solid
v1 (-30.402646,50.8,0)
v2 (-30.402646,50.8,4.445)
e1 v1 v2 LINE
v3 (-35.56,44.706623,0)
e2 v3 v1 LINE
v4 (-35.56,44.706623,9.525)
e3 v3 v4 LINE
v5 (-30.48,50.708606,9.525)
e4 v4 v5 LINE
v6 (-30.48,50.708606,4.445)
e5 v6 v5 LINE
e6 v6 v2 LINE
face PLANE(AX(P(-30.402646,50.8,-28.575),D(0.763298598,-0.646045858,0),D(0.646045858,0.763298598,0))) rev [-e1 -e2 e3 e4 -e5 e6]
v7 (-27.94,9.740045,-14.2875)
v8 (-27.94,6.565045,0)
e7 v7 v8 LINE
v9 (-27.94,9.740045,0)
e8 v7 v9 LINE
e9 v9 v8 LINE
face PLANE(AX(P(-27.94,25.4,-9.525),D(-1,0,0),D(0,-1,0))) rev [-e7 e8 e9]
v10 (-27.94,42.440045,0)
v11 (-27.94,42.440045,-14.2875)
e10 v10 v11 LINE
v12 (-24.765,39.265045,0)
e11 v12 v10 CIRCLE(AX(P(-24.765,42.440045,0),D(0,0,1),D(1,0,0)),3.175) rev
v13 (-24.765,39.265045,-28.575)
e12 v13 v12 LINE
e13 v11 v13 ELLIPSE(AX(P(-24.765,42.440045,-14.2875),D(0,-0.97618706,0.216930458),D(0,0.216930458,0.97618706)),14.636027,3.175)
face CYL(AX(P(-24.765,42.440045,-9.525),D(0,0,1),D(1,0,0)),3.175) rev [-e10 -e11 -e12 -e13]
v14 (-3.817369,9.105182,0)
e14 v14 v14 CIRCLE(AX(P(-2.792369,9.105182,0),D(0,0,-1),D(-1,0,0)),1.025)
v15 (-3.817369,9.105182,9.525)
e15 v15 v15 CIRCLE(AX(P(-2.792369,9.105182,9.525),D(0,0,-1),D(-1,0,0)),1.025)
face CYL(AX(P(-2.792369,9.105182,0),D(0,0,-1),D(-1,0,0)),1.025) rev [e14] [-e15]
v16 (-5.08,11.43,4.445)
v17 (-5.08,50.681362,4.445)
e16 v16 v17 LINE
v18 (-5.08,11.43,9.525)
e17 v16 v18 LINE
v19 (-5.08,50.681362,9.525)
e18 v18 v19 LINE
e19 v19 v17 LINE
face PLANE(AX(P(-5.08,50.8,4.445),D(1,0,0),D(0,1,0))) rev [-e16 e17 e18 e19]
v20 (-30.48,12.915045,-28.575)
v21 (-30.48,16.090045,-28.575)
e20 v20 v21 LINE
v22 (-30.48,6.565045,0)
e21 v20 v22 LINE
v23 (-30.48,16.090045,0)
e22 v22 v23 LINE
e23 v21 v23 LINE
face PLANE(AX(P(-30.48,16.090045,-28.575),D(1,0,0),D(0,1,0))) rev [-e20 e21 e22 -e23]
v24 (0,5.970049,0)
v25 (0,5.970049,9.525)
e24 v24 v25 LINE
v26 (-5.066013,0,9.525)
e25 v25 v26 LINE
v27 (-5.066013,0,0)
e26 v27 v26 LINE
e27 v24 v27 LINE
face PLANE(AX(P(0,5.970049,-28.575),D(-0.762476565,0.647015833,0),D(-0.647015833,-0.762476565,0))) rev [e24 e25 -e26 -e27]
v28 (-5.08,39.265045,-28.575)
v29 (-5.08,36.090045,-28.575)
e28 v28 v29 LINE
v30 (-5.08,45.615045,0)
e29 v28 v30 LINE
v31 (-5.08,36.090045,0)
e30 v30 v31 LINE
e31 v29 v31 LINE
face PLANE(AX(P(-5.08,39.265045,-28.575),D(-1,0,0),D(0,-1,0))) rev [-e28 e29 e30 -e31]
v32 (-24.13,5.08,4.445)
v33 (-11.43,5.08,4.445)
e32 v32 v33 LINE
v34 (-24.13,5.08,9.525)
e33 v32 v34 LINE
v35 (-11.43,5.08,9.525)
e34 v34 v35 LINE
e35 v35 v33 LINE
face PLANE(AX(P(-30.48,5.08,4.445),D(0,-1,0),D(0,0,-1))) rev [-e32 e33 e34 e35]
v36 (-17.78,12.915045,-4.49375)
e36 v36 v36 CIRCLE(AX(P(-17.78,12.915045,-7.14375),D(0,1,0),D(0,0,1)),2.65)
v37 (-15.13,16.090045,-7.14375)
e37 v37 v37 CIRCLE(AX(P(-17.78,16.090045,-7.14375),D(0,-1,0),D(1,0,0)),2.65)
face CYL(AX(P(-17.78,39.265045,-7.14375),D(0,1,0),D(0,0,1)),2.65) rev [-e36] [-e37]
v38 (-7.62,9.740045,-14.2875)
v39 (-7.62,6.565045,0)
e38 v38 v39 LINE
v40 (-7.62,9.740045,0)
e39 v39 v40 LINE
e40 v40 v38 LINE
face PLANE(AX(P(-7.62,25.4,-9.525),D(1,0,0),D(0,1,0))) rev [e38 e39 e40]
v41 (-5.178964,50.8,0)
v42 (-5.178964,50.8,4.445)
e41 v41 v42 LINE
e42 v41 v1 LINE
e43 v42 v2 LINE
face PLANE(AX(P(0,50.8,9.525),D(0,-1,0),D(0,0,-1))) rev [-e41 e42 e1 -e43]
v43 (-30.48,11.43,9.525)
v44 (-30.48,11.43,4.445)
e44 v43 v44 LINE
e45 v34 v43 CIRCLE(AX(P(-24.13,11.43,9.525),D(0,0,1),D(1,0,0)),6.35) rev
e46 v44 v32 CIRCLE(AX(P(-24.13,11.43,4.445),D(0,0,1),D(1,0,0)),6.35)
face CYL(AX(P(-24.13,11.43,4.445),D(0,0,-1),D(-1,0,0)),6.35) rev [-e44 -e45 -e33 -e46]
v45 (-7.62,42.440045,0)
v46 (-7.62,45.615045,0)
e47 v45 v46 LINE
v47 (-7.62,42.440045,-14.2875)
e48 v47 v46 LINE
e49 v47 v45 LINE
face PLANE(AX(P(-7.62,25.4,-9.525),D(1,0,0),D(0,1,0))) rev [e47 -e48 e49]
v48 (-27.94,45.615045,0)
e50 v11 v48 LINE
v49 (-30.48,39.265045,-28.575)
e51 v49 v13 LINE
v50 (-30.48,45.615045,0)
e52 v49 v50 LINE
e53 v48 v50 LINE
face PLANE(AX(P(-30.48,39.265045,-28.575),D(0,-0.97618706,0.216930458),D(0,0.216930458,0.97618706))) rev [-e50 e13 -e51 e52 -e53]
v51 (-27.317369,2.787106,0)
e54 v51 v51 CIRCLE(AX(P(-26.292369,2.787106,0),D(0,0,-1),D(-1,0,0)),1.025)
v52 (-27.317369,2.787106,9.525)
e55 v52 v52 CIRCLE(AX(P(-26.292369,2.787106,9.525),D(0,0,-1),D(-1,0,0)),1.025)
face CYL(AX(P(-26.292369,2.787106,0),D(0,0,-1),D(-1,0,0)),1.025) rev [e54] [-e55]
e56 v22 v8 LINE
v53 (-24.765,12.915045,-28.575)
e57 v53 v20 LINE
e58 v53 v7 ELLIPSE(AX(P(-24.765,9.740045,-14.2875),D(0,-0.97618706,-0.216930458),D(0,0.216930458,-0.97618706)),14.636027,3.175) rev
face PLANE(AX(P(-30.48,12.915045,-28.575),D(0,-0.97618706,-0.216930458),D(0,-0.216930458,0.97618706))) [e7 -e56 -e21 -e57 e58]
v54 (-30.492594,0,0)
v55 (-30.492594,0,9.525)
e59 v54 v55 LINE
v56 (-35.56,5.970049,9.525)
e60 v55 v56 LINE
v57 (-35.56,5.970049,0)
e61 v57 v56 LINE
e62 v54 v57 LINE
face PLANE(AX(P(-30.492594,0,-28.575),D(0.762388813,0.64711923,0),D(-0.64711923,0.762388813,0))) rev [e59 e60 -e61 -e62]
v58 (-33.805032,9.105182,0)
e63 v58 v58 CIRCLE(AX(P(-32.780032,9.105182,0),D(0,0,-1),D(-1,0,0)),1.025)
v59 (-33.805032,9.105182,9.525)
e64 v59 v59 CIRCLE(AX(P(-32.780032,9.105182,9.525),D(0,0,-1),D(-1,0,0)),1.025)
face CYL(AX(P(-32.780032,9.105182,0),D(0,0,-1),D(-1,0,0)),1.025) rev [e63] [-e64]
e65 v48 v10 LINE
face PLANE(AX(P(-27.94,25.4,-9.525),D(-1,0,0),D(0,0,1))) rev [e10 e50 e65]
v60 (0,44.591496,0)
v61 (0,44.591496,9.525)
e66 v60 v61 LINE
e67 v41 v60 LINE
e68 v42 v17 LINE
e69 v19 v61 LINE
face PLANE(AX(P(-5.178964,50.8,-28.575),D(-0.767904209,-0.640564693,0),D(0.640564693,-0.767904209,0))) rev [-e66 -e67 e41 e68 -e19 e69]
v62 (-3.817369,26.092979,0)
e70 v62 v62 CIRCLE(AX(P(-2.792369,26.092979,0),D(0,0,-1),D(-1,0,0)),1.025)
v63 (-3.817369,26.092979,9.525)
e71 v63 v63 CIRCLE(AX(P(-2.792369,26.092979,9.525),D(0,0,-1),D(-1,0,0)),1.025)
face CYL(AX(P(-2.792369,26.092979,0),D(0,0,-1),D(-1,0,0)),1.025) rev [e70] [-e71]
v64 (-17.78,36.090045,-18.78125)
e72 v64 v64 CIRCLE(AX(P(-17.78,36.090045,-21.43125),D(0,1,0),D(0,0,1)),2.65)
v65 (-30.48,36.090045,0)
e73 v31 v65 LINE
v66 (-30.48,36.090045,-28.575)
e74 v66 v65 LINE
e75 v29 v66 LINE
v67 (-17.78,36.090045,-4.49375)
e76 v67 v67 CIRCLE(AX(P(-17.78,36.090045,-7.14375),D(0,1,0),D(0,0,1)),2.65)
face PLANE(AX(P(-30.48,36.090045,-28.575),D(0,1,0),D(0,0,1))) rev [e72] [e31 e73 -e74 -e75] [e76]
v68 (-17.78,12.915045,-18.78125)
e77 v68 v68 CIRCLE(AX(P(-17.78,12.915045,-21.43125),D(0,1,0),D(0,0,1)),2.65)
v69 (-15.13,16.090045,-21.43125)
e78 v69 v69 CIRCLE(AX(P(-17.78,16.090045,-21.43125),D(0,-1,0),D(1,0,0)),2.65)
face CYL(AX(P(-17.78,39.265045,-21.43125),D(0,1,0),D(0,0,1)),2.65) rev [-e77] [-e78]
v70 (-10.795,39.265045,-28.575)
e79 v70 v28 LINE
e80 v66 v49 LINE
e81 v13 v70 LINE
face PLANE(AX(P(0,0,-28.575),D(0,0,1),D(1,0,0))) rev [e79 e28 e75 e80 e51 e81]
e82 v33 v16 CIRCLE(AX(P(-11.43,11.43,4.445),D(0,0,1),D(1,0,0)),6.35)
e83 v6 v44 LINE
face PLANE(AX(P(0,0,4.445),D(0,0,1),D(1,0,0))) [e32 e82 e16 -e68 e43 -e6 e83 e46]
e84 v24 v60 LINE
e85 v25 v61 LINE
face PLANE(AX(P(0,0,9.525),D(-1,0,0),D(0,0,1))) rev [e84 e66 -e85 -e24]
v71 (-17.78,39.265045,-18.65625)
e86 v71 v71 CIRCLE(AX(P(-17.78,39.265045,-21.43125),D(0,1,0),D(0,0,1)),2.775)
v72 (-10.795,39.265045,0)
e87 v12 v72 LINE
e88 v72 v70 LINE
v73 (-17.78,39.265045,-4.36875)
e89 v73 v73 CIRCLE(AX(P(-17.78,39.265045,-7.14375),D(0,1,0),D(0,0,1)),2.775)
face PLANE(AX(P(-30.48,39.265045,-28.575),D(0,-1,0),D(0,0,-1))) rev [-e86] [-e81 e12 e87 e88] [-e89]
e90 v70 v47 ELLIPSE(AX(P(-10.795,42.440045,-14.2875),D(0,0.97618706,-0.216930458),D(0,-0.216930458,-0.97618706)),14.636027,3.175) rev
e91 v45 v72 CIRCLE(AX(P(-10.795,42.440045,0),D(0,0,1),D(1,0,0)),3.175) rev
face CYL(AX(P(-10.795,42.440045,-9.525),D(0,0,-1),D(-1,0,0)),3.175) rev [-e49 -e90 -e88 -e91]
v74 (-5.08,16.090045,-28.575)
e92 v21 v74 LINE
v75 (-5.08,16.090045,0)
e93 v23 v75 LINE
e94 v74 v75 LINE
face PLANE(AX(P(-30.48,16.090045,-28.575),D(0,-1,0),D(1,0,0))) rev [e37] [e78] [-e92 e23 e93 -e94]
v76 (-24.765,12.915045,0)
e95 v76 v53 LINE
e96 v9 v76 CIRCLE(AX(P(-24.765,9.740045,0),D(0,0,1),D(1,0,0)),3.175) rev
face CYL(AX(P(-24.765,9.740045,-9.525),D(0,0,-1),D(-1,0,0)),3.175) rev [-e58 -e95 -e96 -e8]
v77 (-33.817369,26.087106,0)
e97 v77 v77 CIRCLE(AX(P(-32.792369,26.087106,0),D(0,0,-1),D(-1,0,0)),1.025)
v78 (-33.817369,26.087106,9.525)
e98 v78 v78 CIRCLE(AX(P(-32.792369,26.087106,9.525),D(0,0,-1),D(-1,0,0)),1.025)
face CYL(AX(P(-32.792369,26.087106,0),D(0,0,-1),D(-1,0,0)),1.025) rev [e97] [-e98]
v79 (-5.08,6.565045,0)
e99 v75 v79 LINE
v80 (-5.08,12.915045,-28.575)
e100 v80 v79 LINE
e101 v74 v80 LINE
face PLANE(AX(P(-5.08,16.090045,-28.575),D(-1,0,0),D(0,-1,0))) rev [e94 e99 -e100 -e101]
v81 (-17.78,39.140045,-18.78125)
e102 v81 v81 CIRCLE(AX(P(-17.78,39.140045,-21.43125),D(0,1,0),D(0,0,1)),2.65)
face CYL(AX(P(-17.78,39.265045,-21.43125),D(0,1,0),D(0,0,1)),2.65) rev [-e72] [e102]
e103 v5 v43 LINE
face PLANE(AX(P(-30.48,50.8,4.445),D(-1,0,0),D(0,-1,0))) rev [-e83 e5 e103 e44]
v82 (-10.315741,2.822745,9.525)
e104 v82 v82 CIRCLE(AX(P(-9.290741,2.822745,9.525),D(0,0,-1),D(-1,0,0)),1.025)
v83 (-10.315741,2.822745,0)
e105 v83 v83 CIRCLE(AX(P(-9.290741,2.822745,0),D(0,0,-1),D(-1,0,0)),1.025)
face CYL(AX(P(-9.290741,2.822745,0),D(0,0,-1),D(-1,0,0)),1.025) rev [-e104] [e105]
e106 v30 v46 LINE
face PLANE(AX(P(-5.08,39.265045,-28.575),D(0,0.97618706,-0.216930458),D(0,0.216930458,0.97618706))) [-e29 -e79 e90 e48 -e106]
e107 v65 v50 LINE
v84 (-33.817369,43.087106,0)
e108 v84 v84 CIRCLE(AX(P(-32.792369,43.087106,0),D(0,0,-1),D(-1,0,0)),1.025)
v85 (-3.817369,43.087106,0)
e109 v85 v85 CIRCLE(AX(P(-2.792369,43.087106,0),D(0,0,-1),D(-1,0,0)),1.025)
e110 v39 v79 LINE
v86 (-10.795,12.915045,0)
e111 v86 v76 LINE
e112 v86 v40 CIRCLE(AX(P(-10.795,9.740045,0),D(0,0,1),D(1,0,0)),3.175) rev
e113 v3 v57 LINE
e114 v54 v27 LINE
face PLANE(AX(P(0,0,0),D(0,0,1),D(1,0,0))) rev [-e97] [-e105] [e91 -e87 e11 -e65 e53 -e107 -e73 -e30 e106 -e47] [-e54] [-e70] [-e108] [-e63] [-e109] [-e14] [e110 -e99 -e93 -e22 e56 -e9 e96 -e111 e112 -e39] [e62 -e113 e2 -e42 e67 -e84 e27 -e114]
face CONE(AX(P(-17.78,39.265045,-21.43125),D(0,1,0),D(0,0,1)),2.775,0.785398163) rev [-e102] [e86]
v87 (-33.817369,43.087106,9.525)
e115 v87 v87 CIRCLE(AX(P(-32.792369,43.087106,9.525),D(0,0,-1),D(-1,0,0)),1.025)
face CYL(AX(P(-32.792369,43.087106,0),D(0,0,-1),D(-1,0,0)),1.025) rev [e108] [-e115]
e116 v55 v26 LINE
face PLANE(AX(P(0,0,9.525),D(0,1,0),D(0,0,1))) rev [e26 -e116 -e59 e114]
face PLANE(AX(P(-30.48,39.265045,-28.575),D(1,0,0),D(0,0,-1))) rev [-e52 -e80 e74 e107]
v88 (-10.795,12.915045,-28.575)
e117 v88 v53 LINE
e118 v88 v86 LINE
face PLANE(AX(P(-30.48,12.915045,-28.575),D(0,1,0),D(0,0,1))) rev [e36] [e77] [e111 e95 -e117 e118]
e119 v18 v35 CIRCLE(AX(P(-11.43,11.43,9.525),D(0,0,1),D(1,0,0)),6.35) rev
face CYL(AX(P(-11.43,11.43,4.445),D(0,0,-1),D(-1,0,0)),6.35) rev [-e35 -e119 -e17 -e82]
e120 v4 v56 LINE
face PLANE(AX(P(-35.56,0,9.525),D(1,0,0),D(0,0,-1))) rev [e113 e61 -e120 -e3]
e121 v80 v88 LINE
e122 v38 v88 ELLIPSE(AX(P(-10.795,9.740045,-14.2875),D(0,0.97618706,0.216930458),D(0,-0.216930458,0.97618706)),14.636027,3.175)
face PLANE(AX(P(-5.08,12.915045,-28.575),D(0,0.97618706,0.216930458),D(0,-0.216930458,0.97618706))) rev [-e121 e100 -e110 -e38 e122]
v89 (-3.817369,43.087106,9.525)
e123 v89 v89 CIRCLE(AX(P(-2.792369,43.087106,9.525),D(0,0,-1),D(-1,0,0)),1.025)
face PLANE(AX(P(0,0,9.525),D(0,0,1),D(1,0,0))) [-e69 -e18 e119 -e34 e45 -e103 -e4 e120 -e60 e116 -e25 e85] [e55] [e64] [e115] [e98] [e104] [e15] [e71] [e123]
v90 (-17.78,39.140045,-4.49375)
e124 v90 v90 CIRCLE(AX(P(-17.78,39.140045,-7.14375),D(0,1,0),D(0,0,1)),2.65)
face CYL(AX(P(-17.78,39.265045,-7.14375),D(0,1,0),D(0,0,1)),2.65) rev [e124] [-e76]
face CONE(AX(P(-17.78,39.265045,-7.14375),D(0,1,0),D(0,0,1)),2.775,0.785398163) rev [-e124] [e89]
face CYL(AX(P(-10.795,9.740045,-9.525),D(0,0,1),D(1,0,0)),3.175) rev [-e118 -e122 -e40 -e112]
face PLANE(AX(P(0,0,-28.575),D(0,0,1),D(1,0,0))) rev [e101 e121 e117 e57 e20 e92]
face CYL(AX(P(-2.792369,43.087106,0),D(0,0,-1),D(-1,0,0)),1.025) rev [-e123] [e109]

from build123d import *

# Parameters (mm, degrees)
SKETCH1_W                      = 35.56
SKETCH1_H                      = 50.8
BOSS_EXTRUDE1_DEPTH            = 9.525
SKETCH2_W                      = 25.4
SKETCH2_H                      = 45.72
CUT_EXTRUDE2_DEPTH             = 5.08
TAP_DRILL_FOR_M2_5X0_45_TAP1_D = 2.05
SKETCH13_W                     = 25.4
SKETCH13_H                     = 3.175
BOSS_EXTRUDE2_DEPTH            = 28.575
CUT_EXTRUDE3_DEPTH             = 73.778867812
FILLET1_R                      = 6.35
M5_CLEARANCE_HOLE1_D           = 5.3
M5_CLEARANCE_HOLE1_CSINK_D     = 5.55
M5_CLEARANCE_HOLE1_CSINK_ANGLE = 90
RIB7_REACH                     = 67.774
SKETCH14_WALL_W                = 162.819779212
SKETCH14_WALL_H                = 2.54
RIB8_REACH                     = 67.774
SKETCH15_WALL_W                = 162.819779212
SKETCH15_WALL_H                = 2.54
RIB9_REACH                     = 67.774
SKETCH17_WALL_W                = 162.819779212
SKETCH17_WALL_H                = 2.54
RIB10_REACH                    = 67.774
SKETCH16_WALL_W                = 162.819779212
SKETCH16_WALL_H                = 2.54
FILLET2_R                      = 3.175
FILLET3_R                      = 3.175


with BuildPart() as part:
    # Sketch1 → Boss-Extrude1 (new body)
    with BuildSketch(Plane.XY):
        with Locations((-17.78, 25.4)):
            Rectangle(SKETCH1_W, SKETCH1_H)
    extrude(amount=BOSS_EXTRUDE1_DEPTH)

    # Sketch2 → Cut-Extrude2 (cut)
    with BuildSketch(Plane.XY.offset(9.525)):
        with Locations((-17.78, 27.94)):
            Rectangle(SKETCH2_W, SKETCH2_H)
    extrude(amount=-CUT_EXTRUDE2_DEPTH, mode=Mode.SUBTRACT)

    # Tap Drill for M2.5x0.45 Tap1 (through all)
    with Locations(Plane(origin=(0, 0, 0), x_dir=(-1, 0, 0), z_dir=(0, 0, -1))):
        with Locations((2.792369004, 43.087106138), (2.792369004, 26.092979092), (2.792369004, 9.105182099), (9.290740849, 2.822744672), (26.292369004, 2.787106138), (32.780032006, 9.105182099), (32.792369004, 26.087106138), (32.792369004, 43.087106138)):
            Hole(TAP_DRILL_FOR_M2_5X0_45_TAP1_D / 2)

    # Sketch13 → Boss-Extrude2 (add)
    with BuildSketch(Plane(origin=(0, 0, 0), x_dir=(-1, 0, 0), z_dir=(0, 0, -1))):
        with Locations((17.78, 37.677545037)):
            Rectangle(SKETCH13_W, SKETCH13_H)
        with Locations((17.78, 14.502545037)):
            Rectangle(SKETCH13_W, SKETCH13_H)
    extrude(amount=BOSS_EXTRUDE2_DEPTH)

    # Sketch8 → Cut-Extrude3 (cut, through all)
    with BuildSketch(Plane.XY.offset(9.525)):
        Polygon((-5.178964387, 50.8), (0, 44.591495864), (0, 50.8), align=None)
        Polygon((-35.56, 44.706622517), (-35.56, 50.8), (-30.402645731, 50.8), align=None)
        Polygon((-35.56, 5.970049098), (-35.56, 0), (-30.492594088, 0), align=None)
        Polygon((-5.092594088, -0.031324356), (0, 0), (0, 5.970049098), align=None)
    extrude(amount=-CUT_EXTRUDE3_DEPTH, mode=Mode.SUBTRACT)

    # Fillet1
    fillet1_edges = [part.edges().sort_by_distance(p)[0] for p in [
        (-5.08, 5.08, 6.985),
        (-30.48, 5.08, 6.985),
    ]]
    fillet(fillet1_edges, radius=FILLET1_R)

    # M5 Clearance Hole1 (through all)
    with Locations(Plane(origin=(-17.78, 39.265045037, -7.14375), x_dir=(0, 0, 1), z_dir=(0, 1, 0))):
        with Locations((0, 0), (-14.2875, 0)):
            CounterSinkHole(M5_CLEARANCE_HOLE1_D / 2, M5_CLEARANCE_HOLE1_CSINK_D / 2, counter_sink_angle=M5_CLEARANCE_HOLE1_CSINK_ANGLE)

    # Sketch14 wall → Rib7 (add, up to next)
    with BuildSketch(Plane(origin=(-30.48, 9.740045037, -14.2875), x_dir=(0, -0.216930457819, 0.976187060184), z_dir=(0, 0.976187060184, 0.216930457819)), mode=Mode.PRIVATE) as rib7_sk1:
        with Locations((0, 1.27)):
            Rectangle(SKETCH14_WALL_W, SKETCH14_WALL_H)
    rib7_tool1 = extrude(rib7_sk1.sketch, amount=RIB7_REACH, mode=Mode.PRIVATE) - part.part
    add(rib7_tool1.solids().sort_by_distance((-30.48, 9.740045037, -14.2875))[0])

    # Sketch15 wall → Rib8 (add, up to next)
    with BuildSketch(Plane(origin=(-5.08, 9.740045037, -14.2875), x_dir=(0, -0.216930457819, 0.976187060184), z_dir=(0, -0.976187060184, -0.216930457819)), mode=Mode.PRIVATE) as rib8_sk1:
        with Locations((0, 1.27)):
            Rectangle(SKETCH15_WALL_W, SKETCH15_WALL_H)
    rib8_tool1 = extrude(rib8_sk1.sketch, amount=-RIB8_REACH, mode=Mode.PRIVATE) - part.part
    add(rib8_tool1.solids().sort_by_distance((-5.08, 9.740045037, -14.2875))[0])

    # Sketch17 wall → Rib9 (add, up to next)
    with BuildSketch(Plane(origin=(-5.08, 42.440045037, -14.2875), x_dir=(0, 0.216930457819, 0.976187060184), z_dir=(0, -0.976187060184, 0.216930457819)), mode=Mode.PRIVATE) as rib9_sk1:
        with Locations((0, 1.27)):
            Rectangle(SKETCH17_WALL_W, SKETCH17_WALL_H)
    rib9_tool1 = extrude(rib9_sk1.sketch, amount=RIB9_REACH, mode=Mode.PRIVATE) - part.part
    add(rib9_tool1.solids().sort_by_distance((-5.08, 42.440045037, -14.2875))[0])

    # Sketch16 wall → Rib10 (add, up to next)
    with BuildSketch(Plane(origin=(-30.48, 42.440045037, -14.2875), x_dir=(0, 0.216930457819, 0.976187060184), z_dir=(0, 0.976187060184, -0.216930457819)), mode=Mode.PRIVATE) as rib10_sk1:
        with Locations((0, 1.27)):
            Rectangle(SKETCH16_WALL_W, SKETCH16_WALL_H)
    rib10_tool1 = extrude(rib10_sk1.sketch, amount=-RIB10_REACH, mode=Mode.PRIVATE) - part.part
    add(rib10_tool1.solids().sort_by_distance((-30.48, 42.440045037, -14.2875))[0])

    # Fillet2
    fillet2_edges = [part.edges().sort_by_distance(p)[0] for p in [
        (-27.94, 12.915045037, -14.2875),
        (-7.62, 12.915045037, -14.2875),
    ]]
    fillet(fillet2_edges, radius=FILLET2_R)

    # Fillet3
    fillet3_edges = [part.edges().sort_by_distance(p)[0] for p in [
        (-7.62, 39.265045037, -14.2875),
        (-27.94, 39.265045037, -14.2875),
    ]]
    fillet(fillet3_edges, radius=FILLET3_R)


solid = part.part
